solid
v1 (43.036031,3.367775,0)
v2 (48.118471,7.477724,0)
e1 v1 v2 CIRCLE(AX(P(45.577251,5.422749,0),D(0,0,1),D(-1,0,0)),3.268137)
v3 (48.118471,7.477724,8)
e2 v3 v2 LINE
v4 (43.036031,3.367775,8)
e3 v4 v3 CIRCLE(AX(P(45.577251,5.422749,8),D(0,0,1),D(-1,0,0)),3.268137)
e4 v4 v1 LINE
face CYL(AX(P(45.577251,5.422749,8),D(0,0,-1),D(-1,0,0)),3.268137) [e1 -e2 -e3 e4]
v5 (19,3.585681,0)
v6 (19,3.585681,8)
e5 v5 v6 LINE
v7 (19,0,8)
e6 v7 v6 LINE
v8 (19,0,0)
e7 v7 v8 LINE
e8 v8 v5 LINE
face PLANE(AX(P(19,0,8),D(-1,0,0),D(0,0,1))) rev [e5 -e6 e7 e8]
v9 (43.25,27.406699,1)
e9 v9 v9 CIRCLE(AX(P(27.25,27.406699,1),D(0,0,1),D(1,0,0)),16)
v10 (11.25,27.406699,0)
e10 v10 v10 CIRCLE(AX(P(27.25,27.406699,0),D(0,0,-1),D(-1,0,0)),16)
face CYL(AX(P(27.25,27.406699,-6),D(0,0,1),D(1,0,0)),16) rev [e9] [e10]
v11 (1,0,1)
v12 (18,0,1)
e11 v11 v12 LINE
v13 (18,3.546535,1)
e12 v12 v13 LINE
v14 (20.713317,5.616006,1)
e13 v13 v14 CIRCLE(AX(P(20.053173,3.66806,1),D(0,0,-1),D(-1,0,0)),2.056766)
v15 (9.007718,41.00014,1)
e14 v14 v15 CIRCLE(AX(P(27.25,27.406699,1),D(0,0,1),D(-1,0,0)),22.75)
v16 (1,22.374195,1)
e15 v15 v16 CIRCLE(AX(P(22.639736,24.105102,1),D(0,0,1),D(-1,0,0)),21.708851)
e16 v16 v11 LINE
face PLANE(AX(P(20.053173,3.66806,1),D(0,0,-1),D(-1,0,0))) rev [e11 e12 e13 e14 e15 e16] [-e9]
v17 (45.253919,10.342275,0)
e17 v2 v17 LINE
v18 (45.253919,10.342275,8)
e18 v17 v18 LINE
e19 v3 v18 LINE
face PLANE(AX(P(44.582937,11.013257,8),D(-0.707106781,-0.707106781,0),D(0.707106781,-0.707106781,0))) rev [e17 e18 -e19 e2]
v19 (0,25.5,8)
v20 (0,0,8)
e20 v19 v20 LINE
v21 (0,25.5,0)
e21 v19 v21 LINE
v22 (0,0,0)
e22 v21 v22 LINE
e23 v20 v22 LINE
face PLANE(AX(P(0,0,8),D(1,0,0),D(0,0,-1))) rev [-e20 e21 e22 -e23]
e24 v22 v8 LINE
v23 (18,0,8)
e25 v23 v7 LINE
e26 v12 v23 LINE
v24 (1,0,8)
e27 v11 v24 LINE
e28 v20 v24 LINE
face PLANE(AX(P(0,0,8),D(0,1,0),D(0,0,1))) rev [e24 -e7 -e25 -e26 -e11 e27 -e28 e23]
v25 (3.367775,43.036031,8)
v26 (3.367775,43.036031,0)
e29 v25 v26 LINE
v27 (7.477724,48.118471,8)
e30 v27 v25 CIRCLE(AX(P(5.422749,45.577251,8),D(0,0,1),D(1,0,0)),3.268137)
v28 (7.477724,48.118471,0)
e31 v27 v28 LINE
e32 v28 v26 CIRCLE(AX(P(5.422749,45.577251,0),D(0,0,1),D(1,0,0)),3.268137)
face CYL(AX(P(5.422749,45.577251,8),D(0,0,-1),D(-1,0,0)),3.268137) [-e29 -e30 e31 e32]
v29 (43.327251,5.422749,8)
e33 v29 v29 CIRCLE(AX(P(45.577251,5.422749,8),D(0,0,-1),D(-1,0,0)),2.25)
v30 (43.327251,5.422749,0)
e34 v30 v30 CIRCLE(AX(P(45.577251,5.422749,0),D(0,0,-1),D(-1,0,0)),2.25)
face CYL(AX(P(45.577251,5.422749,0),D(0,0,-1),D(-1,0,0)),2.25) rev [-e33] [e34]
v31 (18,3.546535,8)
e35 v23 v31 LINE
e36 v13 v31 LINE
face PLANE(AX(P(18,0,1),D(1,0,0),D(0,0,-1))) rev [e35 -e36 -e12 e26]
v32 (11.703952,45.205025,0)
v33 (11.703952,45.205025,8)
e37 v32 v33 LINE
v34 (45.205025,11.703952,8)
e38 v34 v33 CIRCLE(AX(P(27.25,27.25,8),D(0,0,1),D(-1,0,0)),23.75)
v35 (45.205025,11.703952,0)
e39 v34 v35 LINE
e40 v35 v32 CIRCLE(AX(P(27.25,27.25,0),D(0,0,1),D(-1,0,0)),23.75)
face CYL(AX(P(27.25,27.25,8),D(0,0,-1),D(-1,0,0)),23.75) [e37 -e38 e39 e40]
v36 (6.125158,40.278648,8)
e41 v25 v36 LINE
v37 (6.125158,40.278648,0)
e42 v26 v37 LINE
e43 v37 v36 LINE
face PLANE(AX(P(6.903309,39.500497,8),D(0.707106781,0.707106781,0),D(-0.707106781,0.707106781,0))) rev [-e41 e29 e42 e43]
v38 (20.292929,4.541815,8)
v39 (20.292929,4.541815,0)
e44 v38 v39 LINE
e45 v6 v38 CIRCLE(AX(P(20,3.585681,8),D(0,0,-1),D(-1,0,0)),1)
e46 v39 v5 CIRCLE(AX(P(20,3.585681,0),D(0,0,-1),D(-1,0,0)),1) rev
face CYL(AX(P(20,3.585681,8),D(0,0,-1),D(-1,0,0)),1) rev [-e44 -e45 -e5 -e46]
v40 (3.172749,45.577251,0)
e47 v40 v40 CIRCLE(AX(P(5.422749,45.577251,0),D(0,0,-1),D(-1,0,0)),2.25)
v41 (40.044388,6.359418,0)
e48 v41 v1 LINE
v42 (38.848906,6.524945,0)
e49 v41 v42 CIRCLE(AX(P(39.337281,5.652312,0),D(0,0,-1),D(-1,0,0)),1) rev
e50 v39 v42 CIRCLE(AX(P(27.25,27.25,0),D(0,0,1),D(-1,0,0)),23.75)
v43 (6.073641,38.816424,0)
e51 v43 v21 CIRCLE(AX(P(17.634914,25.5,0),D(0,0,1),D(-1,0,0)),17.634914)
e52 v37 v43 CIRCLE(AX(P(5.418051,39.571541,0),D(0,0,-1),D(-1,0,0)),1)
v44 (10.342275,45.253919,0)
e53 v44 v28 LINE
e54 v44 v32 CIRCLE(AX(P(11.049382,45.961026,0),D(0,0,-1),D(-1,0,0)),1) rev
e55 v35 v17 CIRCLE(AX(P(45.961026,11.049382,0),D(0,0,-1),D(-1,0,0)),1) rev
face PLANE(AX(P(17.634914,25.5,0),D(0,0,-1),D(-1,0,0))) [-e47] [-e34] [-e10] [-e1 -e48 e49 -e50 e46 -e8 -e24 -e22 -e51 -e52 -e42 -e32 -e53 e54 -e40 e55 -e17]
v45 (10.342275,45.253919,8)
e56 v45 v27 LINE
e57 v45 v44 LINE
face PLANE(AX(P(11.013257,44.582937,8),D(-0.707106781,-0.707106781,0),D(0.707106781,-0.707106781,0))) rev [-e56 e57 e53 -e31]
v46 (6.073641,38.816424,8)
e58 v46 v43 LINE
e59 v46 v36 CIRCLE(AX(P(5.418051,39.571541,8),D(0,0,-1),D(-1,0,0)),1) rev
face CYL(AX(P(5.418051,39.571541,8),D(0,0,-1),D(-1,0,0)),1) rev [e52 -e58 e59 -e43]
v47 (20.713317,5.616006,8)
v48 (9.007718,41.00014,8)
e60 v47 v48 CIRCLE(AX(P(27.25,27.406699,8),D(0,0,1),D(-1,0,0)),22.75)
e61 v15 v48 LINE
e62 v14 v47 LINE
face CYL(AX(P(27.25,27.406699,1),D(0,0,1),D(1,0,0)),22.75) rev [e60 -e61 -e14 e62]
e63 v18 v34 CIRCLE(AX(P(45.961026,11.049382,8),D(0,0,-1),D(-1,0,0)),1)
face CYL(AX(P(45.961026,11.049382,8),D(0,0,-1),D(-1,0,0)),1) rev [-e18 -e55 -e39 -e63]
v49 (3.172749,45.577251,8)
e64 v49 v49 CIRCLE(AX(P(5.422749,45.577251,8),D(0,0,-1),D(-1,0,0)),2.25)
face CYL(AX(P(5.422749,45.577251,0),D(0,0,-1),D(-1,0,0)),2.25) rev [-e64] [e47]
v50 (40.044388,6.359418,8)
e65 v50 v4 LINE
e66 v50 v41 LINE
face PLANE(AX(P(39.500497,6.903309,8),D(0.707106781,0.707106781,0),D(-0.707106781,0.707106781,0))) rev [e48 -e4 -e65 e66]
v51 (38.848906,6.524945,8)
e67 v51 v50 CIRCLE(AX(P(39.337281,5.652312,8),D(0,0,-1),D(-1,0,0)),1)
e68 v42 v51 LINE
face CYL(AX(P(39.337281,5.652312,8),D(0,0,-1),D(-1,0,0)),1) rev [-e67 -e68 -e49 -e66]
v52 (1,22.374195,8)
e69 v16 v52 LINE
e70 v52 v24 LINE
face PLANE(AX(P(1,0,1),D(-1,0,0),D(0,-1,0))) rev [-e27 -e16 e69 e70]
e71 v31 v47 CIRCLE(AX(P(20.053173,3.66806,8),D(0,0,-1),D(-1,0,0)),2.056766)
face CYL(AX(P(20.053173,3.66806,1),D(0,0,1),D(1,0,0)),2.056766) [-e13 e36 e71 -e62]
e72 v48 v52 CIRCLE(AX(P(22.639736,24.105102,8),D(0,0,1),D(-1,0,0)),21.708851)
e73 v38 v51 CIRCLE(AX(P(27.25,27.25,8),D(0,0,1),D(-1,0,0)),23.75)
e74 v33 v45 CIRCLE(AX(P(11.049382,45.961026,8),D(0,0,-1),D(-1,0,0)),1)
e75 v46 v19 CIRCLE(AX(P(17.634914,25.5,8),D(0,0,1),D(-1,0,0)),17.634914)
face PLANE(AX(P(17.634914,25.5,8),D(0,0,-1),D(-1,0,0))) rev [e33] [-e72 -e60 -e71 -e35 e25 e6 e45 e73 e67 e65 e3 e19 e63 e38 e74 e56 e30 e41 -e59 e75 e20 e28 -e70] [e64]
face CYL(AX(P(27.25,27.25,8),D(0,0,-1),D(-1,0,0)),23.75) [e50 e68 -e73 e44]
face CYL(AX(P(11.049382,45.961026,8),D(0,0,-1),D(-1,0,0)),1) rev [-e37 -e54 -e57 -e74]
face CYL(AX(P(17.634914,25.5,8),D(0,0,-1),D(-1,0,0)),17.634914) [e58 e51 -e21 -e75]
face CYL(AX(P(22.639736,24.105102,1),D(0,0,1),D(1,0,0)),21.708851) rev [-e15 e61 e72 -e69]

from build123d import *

# Parameters (mm, degrees)
BOSS_EXTRUDE1_DEPTH   = 8
FILLET1_R             = 1
FILLET2_R             = 1
FILLET3_R             = 1
CUT_EXTRUDE1_DEPTH    = 7
SKETCH3_R             = 16
CUT_EXTRUDE2_DEPTH    = 7
F_4_0MM_DOWEL_HOLE1_D = 4.5


with BuildPart() as part:
    # Sketch1 → Boss-Extrude1 (new body)
    with BuildSketch(Plane.XY):
        with BuildLine():
            Line((11.013257462, 44.582936616), (7.477723556, 48.118470522))
            ThreePointArc((7.477723556, 48.118470522), (2.881529478, 47.63222476), (3.36777524, 43.036030683))
            Line((3.36777524, 43.036030683), (6.903309146, 39.500496777))
            ThreePointArc((6.903309146, 39.500496777), (6.899494188, 39.494158329), (6.895681204, 39.487818693))
            ThreePointArc((6.895681204, 39.487818693), (1.817587447, 33.297587625), (0, 25.5))
            Line((0, 25.5), (0, 0))
            Line((0, 0), (19, 0))
            Line((19, 0), (19, 4.978942549))
            ThreePointArc((19, 4.978942549), (29.469637429, 3.603949385), (39.500496777, 6.903309146))
            Line((39.500496777, 6.903309146), (43.036030683, 3.36777524))
            ThreePointArc((43.036030683, 3.36777524), (47.63222476, 2.881529478), (48.118470522, 7.477723556))
            Line((48.118470522, 7.477723556), (44.582936616, 11.013257462))
            ThreePointArc((44.582936616, 11.013257462), (44.043786053, 44.043786053), (11.013257462, 44.582936616))
        make_face()
    extrude(amount=BOSS_EXTRUDE1_DEPTH)

    # Fillet1
    # the kernel refuses this fillet: 1 mm, written as the material it adds along each edge
    with BuildSketch(Plane(origin=(6.895681204, 39.487818693, 0), x_dir=(-0.6978515576075072, 0.7162424195373911, 0), z_dir=(0, 0, 1))) as fillet1_piece_1:
        with BuildLine():
            CenterArc((1.091132345, 0.99991544), FILLET1_R, 176.70951396, 94.03559873)
            Line((0.092780983, 1.057313692), (-0.007054153, 1.063053517))
            ThreePointArc((-0.007054153, 1.063053517), (-0.04527045, 0.536700242), (-0.099309015, 0.011735396))
            Line((-0.099309015, 0.011735396), (-0.096713844, -0.025425035))
            ThreePointArc((-0.096713844, -0.025425035), (0.005057841, -0.114302419), (1.105437078, -0.099991544))
            Line((1.105437078, -0.099991544), (1.104136648, 0))
        make_face()
    extrude(amount=8)
    with BuildSketch(Plane(origin=(6.903309146, 39.500496777, 0), x_dir=(-0.7071067811865462, 0.7071067811865487, 0), z_dir=(0, 0, 1))) as fillet1_piece_2:
        with BuildLine():
            CenterArc((1.100472293, 1), FILLET1_R, 175.96440127, 94.03559873)
            Line((0.102951776, 1.070376262), (0.003199724, 1.077413888))
            ThreePointArc((0.003199724, 1.077413888), (-0.102718997, 0.027384376), (-0.097051337, -0.024104732))
            Line((-0.097051337, -0.024104732), (0, -0.1))
            Line((0, -0.1), (1.100472293, -0.1))
            Line((1.100472293, -0.1), (1.100472293, 0))
        make_face()
    extrude(amount=8)

    # Fillet2
    fillet2_edges = [part.edges().sort_by_distance(p)[0] for p in [
        (11.013257462, 44.582936616, 4),
        (44.582936616, 11.013257462, 4),
        (39.500496777, 6.903309146, 4),
    ]]
    fillet(fillet2_edges, radius=FILLET2_R)

    # Fillet3
    fillet3_edges = [part.edges().sort_by_distance(p)[0] for p in [
        (19, 4.978942549, 4),
    ]]
    fillet(fillet3_edges, radius=FILLET3_R)

    # Sketch2 → Cut-Extrude1 (cut)
    with BuildSketch(Plane.XY.offset(8)):
        with BuildLine():
            Line((1, 0), (1, 22.374195455))
            ThreePointArc((1, 22.374195455), (2.695924616, 32.679401027), (9.007717621, 41.000139649))
            ThreePointArc((9.007717621, 41.000139649), (48.848807822, 34.55190705), (20.71331744, 5.616006286))
            ThreePointArc((20.71331744, 5.616006286), (18.805851762, 5.30344249), (18, 3.546534873))
            Line((18, 3.546534873), (18, 0))
            Line((18, 0), (1, 0))
        make_face()
    extrude(amount=-CUT_EXTRUDE1_DEPTH, mode=Mode.SUBTRACT)

    # Sketch3 → Cut-Extrude2 (cut)
    with BuildSketch(Plane.XY.offset(1)):
        with Locations((27.25, 27.406698819)):
            Circle(SKETCH3_R)
    extrude(amount=-CUT_EXTRUDE2_DEPTH, mode=Mode.SUBTRACT)

    # Ø4.0mm Dowel Hole1 (through all)
    with Locations(Plane(origin=(0, 0, 0), x_dir=(-1, 0, 0), z_dir=(0, 0, -1))):
        with Locations((-45.577250602, 5.422749398), (-5.422749398, 45.577250602)):
            Hole(F_4_0MM_DOWEL_HOLE1_D / 2)


solid = part.part
